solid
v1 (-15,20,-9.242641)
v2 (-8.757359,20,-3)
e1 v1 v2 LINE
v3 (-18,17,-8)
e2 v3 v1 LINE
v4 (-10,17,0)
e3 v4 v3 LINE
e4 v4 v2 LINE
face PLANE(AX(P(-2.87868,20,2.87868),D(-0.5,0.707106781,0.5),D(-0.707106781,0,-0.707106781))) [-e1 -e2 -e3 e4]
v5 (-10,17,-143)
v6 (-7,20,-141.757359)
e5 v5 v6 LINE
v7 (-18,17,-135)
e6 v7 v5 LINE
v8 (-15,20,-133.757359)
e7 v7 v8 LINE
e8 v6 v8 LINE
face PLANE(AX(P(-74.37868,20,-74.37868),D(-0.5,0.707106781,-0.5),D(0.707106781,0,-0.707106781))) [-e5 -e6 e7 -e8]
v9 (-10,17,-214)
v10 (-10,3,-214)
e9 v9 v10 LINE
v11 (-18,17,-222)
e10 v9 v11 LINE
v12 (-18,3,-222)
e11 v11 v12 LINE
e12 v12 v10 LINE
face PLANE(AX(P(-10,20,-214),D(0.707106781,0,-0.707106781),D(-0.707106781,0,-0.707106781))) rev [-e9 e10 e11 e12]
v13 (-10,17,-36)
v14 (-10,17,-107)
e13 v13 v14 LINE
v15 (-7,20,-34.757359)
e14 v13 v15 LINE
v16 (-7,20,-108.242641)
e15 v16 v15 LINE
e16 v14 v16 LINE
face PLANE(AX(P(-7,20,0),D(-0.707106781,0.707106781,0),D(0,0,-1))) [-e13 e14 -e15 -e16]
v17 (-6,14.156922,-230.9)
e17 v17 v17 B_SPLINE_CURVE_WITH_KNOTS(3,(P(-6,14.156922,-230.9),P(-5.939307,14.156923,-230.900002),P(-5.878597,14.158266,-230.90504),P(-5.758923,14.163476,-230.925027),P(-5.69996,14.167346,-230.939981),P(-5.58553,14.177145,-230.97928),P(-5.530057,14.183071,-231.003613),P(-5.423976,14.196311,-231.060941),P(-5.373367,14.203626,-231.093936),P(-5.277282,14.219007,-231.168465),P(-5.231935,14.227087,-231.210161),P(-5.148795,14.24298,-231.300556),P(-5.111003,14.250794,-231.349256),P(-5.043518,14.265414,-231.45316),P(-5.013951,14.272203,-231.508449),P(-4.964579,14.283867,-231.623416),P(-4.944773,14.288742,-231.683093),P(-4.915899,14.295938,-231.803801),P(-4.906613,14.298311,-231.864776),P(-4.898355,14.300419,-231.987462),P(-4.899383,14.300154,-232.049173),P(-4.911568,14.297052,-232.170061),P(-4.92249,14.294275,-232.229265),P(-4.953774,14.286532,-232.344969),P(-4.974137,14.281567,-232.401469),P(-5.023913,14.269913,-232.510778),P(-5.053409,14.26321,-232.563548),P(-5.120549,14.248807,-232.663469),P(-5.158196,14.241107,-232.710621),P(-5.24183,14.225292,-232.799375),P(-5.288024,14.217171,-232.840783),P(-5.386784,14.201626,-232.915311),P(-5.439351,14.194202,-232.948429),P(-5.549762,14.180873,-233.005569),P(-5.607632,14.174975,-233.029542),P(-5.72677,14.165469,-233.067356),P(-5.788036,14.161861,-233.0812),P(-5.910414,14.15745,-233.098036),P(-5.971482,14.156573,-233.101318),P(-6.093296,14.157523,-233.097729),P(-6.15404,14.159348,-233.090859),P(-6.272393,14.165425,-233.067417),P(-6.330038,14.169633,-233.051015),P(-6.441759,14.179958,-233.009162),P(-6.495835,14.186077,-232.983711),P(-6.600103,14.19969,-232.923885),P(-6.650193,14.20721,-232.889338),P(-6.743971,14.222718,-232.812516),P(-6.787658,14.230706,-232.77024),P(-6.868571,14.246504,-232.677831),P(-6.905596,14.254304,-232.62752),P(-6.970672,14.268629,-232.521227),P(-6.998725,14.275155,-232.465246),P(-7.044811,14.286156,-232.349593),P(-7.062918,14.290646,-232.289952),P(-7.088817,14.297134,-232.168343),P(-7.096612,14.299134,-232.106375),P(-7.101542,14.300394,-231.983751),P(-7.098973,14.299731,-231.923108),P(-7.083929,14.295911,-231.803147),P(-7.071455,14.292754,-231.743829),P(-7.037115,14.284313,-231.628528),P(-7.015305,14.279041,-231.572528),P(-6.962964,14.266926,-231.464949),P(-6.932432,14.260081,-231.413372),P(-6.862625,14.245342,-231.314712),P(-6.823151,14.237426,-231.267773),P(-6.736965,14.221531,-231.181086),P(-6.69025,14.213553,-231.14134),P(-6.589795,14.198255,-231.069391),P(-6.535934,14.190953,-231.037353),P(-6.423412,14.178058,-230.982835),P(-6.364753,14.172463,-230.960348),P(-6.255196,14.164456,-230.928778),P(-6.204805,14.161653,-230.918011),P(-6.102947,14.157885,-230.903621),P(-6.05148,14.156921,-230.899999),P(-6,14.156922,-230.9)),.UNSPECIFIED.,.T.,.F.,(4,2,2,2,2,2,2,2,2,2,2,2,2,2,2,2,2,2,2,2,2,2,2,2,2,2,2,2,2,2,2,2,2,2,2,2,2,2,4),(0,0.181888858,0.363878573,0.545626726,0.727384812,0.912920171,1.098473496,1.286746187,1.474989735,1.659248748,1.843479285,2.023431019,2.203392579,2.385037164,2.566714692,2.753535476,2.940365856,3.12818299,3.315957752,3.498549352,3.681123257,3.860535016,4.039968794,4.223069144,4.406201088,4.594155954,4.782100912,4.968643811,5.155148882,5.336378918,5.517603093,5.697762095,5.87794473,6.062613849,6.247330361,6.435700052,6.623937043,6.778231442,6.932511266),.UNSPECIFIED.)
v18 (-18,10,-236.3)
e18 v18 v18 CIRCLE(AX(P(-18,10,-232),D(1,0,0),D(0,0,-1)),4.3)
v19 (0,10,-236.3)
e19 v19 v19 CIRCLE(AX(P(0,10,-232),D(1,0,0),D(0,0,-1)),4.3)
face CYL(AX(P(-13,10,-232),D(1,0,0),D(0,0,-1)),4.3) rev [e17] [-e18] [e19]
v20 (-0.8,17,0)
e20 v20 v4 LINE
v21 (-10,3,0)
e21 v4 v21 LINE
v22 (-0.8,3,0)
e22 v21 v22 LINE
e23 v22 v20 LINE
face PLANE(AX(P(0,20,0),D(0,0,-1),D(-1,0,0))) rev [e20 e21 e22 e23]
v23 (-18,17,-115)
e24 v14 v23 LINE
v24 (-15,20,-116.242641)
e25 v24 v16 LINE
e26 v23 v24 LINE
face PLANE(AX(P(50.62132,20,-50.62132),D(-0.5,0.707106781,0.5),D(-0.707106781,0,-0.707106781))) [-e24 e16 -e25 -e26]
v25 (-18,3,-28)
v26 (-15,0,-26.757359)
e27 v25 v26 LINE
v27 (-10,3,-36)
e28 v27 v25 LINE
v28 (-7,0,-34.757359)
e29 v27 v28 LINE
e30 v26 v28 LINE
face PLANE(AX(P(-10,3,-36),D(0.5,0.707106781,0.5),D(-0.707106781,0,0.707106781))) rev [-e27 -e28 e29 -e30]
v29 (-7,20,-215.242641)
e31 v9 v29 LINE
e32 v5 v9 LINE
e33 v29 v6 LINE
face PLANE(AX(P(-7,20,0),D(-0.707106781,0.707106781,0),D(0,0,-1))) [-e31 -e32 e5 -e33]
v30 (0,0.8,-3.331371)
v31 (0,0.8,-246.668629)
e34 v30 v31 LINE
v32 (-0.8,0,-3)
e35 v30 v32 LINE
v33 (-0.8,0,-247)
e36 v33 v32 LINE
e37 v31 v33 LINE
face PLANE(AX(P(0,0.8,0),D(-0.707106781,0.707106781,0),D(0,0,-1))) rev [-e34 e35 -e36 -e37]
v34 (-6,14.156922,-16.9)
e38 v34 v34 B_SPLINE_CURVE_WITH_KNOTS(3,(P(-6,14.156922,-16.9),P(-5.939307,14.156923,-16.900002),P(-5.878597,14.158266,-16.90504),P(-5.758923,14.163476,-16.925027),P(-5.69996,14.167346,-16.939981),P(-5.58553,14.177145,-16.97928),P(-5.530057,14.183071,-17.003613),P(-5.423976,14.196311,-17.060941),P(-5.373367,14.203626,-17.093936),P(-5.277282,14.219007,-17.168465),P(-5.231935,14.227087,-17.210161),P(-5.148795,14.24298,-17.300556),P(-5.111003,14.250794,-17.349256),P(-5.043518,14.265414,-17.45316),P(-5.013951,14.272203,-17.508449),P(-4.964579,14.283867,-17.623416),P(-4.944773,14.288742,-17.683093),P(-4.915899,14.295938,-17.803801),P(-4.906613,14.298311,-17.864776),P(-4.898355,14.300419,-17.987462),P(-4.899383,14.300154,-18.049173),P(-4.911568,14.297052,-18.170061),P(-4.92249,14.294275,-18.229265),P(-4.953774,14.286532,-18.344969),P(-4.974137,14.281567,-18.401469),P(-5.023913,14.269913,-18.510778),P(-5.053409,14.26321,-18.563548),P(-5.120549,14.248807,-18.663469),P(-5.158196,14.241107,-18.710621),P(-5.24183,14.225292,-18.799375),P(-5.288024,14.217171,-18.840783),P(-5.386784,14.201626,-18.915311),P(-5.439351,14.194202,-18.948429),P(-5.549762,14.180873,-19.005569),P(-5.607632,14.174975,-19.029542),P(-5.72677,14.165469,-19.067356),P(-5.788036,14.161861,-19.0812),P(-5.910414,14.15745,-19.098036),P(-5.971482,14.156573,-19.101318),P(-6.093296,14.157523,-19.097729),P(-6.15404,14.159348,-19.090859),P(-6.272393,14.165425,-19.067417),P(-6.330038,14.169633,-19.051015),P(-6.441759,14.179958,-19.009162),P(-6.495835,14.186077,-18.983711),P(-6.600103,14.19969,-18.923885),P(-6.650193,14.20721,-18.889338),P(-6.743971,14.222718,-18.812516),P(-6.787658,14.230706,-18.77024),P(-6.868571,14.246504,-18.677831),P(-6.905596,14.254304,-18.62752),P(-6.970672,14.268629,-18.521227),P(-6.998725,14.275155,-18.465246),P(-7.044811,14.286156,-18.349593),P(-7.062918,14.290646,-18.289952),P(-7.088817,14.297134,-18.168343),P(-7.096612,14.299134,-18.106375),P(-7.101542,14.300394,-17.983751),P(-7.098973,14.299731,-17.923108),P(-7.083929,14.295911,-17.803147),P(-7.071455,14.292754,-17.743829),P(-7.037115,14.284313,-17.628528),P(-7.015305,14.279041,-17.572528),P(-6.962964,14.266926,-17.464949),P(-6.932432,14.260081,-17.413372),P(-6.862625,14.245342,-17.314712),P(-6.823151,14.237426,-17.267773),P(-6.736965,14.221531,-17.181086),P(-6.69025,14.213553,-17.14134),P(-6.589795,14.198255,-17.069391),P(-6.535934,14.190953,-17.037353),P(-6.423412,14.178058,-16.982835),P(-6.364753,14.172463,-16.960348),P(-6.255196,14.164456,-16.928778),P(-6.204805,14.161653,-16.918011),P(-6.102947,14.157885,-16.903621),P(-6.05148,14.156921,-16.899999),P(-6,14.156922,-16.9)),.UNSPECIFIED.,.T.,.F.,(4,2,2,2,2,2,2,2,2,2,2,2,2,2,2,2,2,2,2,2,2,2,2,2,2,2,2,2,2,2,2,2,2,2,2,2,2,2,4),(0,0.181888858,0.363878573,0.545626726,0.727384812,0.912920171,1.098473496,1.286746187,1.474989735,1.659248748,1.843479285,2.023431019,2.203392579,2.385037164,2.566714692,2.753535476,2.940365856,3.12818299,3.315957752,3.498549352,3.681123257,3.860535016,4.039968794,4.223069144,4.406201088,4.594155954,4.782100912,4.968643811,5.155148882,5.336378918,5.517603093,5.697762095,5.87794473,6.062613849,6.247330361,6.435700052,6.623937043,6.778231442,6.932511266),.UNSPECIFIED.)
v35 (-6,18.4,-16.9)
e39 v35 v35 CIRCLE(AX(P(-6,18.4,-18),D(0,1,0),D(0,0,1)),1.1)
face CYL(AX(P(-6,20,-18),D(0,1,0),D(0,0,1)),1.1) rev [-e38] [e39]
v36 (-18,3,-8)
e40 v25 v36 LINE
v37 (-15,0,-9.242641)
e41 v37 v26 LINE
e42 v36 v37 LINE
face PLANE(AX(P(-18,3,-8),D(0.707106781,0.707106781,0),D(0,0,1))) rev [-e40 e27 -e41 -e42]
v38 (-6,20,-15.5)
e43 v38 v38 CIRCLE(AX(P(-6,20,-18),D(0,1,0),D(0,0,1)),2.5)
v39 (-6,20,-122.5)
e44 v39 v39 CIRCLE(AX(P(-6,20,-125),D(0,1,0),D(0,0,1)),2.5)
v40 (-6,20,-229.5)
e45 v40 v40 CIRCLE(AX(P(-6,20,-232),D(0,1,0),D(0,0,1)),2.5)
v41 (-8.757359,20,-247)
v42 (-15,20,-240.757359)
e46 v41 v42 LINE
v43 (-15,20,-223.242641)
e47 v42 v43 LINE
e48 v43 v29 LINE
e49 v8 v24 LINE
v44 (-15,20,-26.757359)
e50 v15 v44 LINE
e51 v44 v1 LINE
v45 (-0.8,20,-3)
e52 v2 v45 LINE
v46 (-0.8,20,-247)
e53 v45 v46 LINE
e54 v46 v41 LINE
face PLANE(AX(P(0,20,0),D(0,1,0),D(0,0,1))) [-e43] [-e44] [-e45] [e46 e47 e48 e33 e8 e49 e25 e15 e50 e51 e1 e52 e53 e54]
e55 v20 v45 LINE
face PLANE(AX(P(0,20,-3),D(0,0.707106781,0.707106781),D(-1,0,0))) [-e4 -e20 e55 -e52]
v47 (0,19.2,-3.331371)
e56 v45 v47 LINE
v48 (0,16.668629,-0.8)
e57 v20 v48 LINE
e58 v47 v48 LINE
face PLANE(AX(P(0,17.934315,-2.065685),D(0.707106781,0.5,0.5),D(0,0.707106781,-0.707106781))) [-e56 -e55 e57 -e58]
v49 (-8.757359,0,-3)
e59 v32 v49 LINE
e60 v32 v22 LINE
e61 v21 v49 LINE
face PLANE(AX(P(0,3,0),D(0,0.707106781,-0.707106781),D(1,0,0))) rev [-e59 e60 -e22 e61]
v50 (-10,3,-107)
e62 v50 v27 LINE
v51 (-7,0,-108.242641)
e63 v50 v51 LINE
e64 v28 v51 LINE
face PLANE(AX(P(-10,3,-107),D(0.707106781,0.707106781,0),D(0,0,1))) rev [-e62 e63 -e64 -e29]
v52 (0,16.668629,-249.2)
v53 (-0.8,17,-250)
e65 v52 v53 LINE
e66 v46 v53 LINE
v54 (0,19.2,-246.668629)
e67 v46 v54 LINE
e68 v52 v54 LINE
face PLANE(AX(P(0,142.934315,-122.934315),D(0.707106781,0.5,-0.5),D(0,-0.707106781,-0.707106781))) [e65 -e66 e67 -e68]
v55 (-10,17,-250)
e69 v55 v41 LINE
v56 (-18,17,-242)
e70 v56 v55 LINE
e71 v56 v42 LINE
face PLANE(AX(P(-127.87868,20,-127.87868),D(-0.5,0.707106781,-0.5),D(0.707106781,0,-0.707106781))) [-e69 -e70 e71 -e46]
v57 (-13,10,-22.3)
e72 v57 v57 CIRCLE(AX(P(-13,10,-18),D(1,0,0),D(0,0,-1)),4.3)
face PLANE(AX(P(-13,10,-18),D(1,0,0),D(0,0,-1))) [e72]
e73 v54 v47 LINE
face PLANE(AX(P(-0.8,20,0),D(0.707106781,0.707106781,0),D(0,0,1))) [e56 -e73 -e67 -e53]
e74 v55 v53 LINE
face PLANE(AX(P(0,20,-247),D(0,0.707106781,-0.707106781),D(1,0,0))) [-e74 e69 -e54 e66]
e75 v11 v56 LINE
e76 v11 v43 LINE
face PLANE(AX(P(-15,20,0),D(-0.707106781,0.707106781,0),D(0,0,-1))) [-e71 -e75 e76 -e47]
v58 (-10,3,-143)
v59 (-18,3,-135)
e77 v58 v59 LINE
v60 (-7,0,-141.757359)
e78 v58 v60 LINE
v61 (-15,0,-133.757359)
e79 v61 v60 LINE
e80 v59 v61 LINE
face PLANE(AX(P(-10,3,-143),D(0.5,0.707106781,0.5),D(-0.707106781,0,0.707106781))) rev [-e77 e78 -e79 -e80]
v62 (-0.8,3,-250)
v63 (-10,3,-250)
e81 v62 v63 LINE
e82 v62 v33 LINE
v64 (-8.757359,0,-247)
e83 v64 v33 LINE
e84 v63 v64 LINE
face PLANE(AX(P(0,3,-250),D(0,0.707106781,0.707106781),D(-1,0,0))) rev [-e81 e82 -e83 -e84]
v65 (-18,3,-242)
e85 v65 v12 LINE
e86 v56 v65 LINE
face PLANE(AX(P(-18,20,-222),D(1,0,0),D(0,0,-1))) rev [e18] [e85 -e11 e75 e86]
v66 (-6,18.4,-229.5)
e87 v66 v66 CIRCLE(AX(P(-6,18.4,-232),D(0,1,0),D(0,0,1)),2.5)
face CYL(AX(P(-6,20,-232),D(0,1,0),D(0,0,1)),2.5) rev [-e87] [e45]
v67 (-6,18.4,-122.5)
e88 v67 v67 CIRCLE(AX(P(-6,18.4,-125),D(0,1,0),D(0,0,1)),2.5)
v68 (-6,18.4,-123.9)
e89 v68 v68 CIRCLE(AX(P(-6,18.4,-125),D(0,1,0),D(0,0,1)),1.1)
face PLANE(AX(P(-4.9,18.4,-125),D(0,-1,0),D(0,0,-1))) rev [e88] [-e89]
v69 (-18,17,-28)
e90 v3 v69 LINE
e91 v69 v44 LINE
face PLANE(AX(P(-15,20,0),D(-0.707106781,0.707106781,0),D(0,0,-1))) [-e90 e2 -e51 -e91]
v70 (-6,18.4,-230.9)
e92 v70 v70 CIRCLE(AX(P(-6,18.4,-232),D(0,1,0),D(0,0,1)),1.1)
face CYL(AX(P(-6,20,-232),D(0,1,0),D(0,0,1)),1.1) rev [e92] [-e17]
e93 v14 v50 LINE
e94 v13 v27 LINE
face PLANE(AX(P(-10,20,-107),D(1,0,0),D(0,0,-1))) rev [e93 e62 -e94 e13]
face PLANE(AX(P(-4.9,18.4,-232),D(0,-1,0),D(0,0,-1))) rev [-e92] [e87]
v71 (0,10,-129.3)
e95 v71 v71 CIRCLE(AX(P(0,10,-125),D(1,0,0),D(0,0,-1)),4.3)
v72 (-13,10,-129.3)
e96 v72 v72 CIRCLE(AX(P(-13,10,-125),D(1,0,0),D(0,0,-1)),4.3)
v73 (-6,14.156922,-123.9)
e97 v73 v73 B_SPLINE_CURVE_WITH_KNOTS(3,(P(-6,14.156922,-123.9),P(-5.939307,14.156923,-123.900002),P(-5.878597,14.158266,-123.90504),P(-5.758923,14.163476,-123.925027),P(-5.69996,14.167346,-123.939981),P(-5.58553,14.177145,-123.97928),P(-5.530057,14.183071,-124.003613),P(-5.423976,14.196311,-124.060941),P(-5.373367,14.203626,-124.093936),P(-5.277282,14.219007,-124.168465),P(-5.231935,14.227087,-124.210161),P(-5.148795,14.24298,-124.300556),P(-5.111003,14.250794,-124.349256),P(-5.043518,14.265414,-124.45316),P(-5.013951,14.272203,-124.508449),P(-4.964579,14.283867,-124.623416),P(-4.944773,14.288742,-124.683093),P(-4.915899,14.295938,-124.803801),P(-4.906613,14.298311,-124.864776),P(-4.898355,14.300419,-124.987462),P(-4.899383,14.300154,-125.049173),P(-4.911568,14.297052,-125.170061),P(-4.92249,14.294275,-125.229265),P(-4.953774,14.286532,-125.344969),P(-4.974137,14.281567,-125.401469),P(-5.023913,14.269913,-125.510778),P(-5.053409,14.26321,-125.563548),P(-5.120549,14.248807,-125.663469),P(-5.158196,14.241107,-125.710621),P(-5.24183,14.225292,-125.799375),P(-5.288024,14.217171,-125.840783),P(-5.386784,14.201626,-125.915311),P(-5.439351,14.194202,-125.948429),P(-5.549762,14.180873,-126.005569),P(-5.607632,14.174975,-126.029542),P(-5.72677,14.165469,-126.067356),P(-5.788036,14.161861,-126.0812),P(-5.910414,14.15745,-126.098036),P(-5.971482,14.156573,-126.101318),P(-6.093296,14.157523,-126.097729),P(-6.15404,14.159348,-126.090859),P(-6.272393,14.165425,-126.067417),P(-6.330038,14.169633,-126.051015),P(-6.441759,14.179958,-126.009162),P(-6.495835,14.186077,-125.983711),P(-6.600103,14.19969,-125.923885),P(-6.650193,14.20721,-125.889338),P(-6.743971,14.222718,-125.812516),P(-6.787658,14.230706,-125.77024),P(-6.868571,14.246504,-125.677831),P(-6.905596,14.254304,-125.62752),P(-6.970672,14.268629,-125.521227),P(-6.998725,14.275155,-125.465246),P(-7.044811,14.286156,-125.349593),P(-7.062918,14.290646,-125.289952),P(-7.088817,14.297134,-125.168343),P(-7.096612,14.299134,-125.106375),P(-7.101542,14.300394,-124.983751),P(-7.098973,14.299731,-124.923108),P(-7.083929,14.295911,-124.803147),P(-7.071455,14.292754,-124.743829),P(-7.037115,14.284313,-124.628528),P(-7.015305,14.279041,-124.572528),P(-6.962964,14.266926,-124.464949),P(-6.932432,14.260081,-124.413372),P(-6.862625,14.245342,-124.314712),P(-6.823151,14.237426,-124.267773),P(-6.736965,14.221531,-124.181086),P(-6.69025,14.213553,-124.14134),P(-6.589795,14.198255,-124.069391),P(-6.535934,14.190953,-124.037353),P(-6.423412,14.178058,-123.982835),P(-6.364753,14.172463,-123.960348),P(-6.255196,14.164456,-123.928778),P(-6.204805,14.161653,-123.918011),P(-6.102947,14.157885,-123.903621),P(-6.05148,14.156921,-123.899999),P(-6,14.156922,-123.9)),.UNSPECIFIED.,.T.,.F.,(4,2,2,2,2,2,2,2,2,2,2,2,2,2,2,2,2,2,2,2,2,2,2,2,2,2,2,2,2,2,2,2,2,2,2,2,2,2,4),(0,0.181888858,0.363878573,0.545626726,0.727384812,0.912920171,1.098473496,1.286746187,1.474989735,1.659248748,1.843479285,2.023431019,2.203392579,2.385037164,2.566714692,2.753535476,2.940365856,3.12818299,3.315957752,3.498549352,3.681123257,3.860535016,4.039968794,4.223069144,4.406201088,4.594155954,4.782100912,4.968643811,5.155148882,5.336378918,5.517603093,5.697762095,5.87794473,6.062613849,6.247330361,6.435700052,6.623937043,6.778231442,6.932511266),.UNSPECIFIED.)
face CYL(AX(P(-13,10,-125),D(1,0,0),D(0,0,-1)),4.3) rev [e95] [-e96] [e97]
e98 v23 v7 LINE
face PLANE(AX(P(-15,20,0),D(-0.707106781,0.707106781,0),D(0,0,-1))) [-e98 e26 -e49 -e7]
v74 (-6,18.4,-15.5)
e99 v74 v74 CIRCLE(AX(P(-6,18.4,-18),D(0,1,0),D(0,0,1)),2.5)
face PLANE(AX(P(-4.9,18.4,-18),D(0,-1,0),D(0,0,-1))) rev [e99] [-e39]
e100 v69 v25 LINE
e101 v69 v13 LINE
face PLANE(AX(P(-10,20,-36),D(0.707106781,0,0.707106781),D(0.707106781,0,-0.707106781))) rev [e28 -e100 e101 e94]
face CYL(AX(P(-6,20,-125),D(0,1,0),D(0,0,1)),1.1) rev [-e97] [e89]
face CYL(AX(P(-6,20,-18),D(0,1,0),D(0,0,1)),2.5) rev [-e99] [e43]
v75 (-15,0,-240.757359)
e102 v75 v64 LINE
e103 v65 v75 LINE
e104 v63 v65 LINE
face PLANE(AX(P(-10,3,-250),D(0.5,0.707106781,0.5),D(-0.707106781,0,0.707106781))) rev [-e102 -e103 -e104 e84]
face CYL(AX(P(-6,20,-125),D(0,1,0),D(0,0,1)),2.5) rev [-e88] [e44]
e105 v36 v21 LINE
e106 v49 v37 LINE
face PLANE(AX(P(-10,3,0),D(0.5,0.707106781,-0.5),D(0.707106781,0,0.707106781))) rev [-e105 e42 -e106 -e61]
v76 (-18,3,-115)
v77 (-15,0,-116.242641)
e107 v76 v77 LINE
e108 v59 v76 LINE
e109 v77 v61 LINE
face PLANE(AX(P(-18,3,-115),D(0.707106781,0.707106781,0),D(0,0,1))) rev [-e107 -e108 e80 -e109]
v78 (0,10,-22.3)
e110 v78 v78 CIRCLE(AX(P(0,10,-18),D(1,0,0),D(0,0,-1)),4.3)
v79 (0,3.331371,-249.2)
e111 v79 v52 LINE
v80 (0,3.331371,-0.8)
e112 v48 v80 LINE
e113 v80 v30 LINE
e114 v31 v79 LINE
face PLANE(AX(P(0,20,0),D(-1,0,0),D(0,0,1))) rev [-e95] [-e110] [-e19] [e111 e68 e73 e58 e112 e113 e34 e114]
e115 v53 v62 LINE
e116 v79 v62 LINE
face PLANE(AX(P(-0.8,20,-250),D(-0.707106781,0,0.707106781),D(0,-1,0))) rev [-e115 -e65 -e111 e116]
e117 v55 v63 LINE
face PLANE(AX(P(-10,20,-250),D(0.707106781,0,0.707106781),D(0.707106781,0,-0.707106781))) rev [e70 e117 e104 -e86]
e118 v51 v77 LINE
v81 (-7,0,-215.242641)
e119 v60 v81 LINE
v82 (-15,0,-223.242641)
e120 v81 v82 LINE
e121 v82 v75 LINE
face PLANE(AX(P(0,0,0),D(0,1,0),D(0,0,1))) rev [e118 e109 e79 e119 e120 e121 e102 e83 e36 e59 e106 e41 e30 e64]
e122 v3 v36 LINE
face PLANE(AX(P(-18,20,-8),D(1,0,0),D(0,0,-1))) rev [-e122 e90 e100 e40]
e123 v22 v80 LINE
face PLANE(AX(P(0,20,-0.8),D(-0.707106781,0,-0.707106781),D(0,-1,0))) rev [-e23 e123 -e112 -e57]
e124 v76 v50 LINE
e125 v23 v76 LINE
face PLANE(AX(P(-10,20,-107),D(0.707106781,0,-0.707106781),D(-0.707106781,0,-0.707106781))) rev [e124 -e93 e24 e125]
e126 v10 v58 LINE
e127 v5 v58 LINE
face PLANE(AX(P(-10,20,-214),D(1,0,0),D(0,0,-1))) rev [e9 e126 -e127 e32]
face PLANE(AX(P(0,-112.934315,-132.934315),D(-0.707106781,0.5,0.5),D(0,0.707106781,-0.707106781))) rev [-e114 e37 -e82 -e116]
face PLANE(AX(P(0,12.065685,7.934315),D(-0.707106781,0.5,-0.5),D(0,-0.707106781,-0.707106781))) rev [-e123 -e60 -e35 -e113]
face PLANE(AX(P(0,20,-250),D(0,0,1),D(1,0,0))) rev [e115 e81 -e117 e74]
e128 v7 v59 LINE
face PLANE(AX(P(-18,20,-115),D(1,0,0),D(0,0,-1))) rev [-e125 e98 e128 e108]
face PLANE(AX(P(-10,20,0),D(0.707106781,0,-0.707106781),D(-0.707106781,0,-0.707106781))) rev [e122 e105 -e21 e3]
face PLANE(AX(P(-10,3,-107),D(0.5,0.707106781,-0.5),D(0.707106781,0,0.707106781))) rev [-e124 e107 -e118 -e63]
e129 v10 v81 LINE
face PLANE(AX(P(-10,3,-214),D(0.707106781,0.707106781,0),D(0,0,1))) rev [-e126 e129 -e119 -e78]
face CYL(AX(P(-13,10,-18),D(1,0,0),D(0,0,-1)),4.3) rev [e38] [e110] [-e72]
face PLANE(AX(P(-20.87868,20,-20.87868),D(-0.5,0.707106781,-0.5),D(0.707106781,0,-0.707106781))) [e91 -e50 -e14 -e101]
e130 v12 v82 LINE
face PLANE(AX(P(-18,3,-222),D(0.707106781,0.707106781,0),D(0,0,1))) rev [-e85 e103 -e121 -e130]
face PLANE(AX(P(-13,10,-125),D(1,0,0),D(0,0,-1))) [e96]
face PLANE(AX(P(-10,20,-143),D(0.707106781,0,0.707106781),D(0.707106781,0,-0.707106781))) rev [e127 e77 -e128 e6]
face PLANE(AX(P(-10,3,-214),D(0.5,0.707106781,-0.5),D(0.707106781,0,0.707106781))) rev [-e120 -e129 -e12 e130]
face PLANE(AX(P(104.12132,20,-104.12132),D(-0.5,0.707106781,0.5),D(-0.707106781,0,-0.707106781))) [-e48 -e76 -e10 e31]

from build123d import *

# Parameters (mm, degrees)
BOSS_EXTRUDE1_DEPTH                          = 20
SKETCH2_R                                    = 4.3
CUT_EXTRUDE1_DEPTH                           = 13
CBORE_START                                  = 18.4
CBORE_FOR_M2_PAN_HEAD_MACHINE_SCREW1_OUT_R   = 2.5
CBORE_FOR_M2_PAN_HEAD_MACHINE_SCREW1_DEPTH   = 1.6
CBORE_START_2                                = 14.156921837
CBORE_FOR_M2_PAN_HEAD_MACHINE_SCREW1_2_O_R   = 1.1
CBORE_FOR_M2_PAN_HEAD_MACHINE_SCREW1_2_DEPTH = 4.243078163
CHAMFER1_SIZE                                = 3
CHAMFER2_SIZE                                = 0.8
SKETCH2_5_R                                  = 4.3
CUT_EXTRUDE5_DEPTH                           = 252.443830706


# Read off the part's stored shape, not the designer's step: CBORE for M2 Pan Head Machine Screw1
with BuildPart() as part:
    # Sketch1 → Boss-Extrude1 (new body)
    with BuildSketch(Plane(origin=(0, 0, 0), x_dir=(1, 0, 0), z_dir=(0, 1, 0))):
        Polygon((-10, 214), (-10, 143), (-18, 135), (-18, 115), (-10, 107), (-10, 36), (-18, 28), (-18, 8), (-10, 0), (0, 0), (0, 250), (-10, 250), (-18, 242), (-18, 222), align=None)
    extrude(amount=BOSS_EXTRUDE1_DEPTH)

    # Sketch2 → Cut-Extrude1 (cut)
    with BuildSketch(Plane(origin=(0, 0, 0), x_dir=(0, 0, -1), z_dir=(1, 0, 0))):
        with Locations((18, 10)):
            Circle(SKETCH2_R)
        with Locations((125, 10)):
            Circle(SKETCH2_R)
        with Locations((232, 10)):
            Circle(SKETCH2_R)
    extrude(amount=-CUT_EXTRUDE1_DEPTH, mode=Mode.SUBTRACT)

    # CBORE for M2 Pan Head Machine Screw1 out → CBORE for M2 Pan Head Machine Screw1 (cut)
    with BuildSketch(Plane(origin=(0, 0, 0), x_dir=(1, 0, 0), z_dir=(0, 1, 0)).offset(CBORE_START)):
        with Locations((-6, 18)):
            Circle(CBORE_FOR_M2_PAN_HEAD_MACHINE_SCREW1_OUT_R)
        with Locations((-6, 232)):
            Circle(CBORE_FOR_M2_PAN_HEAD_MACHINE_SCREW1_OUT_R)
        with Locations((-6, 125)):
            Circle(CBORE_FOR_M2_PAN_HEAD_MACHINE_SCREW1_OUT_R)
    extrude(amount=CBORE_FOR_M2_PAN_HEAD_MACHINE_SCREW1_DEPTH, mode=Mode.SUBTRACT)

    # CBORE for M2 Pan Head Machine Screw1 2 o → CBORE for M2 Pan Head Machine Screw1 2 (cut)
    with BuildSketch(Plane(origin=(0, 0, 0), x_dir=(1, 0, 0), z_dir=(0, 1, 0)).offset(CBORE_START_2)):
        with Locations((-6, 18)):
            Circle(CBORE_FOR_M2_PAN_HEAD_MACHINE_SCREW1_2_O_R)
        with Locations((-6, 232)):
            Circle(CBORE_FOR_M2_PAN_HEAD_MACHINE_SCREW1_2_O_R)
        with Locations((-6, 125)):
            Circle(CBORE_FOR_M2_PAN_HEAD_MACHINE_SCREW1_2_O_R)
    extrude(amount=CBORE_FOR_M2_PAN_HEAD_MACHINE_SCREW1_2_DEPTH, mode=Mode.SUBTRACT)

    # Chamfer1
    chamfer1_edges = [part.edges().sort_by_distance(p)[0] for p in [
        (-14, 20, -246),
        (-5, 0, 0),
        (-14, 0, -4),
        (-18, 0, -18),
        (-14, 0, -32),
        (-10, 0, -71.5),
        (-14, 0, -111),
        (-18, 0, -125),
        (-14, 0, -139),
        (-18, 20, -232),
        (-10, 0, -178.5),
        (-14, 0, -218),
        (-18, 0, -232),
        (-14, 0, -246),
        (-5, 0, -250),
        (-14, 20, -218),
        (-10, 20, -178.5),
        (-14, 20, -139),
        (-18, 20, -125),
        (-14, 20, -111),
        (-10, 20, -71.5),
        (-14, 20, -32),
        (-18, 20, -18),
        (-14, 20, -4),
        (-5, 20, 0),
        (-5, 20, -250),
    ]]
    chamfer(chamfer1_edges, length=CHAMFER1_SIZE)

    # Chamfer2
    chamfer2_edges = [part.edges().sort_by_distance(p)[0] for p in [
        (0, 10, 0),
        (0, 0, -125),
        (0, 10, -250),
        (0, 20, -125),
        (0, 18.5, -1.5),
        (0, 18.5, -248.5),
        (0, 1.5, -248.5),
        (0, 1.5, -1.5),
    ]]
    chamfer(chamfer2_edges, length=CHAMFER2_SIZE)

    # Sketch2<5> → Cut-Extrude5 (cut, through all)
    with BuildSketch(Plane(origin=(0, 0, 0), x_dir=(0, 0, -1), z_dir=(1, 0, 0))):
        with Locations((232, 10)):
            Circle(SKETCH2_5_R)
    extrude(amount=-CUT_EXTRUDE5_DEPTH, mode=Mode.SUBTRACT)


solid = part.part
